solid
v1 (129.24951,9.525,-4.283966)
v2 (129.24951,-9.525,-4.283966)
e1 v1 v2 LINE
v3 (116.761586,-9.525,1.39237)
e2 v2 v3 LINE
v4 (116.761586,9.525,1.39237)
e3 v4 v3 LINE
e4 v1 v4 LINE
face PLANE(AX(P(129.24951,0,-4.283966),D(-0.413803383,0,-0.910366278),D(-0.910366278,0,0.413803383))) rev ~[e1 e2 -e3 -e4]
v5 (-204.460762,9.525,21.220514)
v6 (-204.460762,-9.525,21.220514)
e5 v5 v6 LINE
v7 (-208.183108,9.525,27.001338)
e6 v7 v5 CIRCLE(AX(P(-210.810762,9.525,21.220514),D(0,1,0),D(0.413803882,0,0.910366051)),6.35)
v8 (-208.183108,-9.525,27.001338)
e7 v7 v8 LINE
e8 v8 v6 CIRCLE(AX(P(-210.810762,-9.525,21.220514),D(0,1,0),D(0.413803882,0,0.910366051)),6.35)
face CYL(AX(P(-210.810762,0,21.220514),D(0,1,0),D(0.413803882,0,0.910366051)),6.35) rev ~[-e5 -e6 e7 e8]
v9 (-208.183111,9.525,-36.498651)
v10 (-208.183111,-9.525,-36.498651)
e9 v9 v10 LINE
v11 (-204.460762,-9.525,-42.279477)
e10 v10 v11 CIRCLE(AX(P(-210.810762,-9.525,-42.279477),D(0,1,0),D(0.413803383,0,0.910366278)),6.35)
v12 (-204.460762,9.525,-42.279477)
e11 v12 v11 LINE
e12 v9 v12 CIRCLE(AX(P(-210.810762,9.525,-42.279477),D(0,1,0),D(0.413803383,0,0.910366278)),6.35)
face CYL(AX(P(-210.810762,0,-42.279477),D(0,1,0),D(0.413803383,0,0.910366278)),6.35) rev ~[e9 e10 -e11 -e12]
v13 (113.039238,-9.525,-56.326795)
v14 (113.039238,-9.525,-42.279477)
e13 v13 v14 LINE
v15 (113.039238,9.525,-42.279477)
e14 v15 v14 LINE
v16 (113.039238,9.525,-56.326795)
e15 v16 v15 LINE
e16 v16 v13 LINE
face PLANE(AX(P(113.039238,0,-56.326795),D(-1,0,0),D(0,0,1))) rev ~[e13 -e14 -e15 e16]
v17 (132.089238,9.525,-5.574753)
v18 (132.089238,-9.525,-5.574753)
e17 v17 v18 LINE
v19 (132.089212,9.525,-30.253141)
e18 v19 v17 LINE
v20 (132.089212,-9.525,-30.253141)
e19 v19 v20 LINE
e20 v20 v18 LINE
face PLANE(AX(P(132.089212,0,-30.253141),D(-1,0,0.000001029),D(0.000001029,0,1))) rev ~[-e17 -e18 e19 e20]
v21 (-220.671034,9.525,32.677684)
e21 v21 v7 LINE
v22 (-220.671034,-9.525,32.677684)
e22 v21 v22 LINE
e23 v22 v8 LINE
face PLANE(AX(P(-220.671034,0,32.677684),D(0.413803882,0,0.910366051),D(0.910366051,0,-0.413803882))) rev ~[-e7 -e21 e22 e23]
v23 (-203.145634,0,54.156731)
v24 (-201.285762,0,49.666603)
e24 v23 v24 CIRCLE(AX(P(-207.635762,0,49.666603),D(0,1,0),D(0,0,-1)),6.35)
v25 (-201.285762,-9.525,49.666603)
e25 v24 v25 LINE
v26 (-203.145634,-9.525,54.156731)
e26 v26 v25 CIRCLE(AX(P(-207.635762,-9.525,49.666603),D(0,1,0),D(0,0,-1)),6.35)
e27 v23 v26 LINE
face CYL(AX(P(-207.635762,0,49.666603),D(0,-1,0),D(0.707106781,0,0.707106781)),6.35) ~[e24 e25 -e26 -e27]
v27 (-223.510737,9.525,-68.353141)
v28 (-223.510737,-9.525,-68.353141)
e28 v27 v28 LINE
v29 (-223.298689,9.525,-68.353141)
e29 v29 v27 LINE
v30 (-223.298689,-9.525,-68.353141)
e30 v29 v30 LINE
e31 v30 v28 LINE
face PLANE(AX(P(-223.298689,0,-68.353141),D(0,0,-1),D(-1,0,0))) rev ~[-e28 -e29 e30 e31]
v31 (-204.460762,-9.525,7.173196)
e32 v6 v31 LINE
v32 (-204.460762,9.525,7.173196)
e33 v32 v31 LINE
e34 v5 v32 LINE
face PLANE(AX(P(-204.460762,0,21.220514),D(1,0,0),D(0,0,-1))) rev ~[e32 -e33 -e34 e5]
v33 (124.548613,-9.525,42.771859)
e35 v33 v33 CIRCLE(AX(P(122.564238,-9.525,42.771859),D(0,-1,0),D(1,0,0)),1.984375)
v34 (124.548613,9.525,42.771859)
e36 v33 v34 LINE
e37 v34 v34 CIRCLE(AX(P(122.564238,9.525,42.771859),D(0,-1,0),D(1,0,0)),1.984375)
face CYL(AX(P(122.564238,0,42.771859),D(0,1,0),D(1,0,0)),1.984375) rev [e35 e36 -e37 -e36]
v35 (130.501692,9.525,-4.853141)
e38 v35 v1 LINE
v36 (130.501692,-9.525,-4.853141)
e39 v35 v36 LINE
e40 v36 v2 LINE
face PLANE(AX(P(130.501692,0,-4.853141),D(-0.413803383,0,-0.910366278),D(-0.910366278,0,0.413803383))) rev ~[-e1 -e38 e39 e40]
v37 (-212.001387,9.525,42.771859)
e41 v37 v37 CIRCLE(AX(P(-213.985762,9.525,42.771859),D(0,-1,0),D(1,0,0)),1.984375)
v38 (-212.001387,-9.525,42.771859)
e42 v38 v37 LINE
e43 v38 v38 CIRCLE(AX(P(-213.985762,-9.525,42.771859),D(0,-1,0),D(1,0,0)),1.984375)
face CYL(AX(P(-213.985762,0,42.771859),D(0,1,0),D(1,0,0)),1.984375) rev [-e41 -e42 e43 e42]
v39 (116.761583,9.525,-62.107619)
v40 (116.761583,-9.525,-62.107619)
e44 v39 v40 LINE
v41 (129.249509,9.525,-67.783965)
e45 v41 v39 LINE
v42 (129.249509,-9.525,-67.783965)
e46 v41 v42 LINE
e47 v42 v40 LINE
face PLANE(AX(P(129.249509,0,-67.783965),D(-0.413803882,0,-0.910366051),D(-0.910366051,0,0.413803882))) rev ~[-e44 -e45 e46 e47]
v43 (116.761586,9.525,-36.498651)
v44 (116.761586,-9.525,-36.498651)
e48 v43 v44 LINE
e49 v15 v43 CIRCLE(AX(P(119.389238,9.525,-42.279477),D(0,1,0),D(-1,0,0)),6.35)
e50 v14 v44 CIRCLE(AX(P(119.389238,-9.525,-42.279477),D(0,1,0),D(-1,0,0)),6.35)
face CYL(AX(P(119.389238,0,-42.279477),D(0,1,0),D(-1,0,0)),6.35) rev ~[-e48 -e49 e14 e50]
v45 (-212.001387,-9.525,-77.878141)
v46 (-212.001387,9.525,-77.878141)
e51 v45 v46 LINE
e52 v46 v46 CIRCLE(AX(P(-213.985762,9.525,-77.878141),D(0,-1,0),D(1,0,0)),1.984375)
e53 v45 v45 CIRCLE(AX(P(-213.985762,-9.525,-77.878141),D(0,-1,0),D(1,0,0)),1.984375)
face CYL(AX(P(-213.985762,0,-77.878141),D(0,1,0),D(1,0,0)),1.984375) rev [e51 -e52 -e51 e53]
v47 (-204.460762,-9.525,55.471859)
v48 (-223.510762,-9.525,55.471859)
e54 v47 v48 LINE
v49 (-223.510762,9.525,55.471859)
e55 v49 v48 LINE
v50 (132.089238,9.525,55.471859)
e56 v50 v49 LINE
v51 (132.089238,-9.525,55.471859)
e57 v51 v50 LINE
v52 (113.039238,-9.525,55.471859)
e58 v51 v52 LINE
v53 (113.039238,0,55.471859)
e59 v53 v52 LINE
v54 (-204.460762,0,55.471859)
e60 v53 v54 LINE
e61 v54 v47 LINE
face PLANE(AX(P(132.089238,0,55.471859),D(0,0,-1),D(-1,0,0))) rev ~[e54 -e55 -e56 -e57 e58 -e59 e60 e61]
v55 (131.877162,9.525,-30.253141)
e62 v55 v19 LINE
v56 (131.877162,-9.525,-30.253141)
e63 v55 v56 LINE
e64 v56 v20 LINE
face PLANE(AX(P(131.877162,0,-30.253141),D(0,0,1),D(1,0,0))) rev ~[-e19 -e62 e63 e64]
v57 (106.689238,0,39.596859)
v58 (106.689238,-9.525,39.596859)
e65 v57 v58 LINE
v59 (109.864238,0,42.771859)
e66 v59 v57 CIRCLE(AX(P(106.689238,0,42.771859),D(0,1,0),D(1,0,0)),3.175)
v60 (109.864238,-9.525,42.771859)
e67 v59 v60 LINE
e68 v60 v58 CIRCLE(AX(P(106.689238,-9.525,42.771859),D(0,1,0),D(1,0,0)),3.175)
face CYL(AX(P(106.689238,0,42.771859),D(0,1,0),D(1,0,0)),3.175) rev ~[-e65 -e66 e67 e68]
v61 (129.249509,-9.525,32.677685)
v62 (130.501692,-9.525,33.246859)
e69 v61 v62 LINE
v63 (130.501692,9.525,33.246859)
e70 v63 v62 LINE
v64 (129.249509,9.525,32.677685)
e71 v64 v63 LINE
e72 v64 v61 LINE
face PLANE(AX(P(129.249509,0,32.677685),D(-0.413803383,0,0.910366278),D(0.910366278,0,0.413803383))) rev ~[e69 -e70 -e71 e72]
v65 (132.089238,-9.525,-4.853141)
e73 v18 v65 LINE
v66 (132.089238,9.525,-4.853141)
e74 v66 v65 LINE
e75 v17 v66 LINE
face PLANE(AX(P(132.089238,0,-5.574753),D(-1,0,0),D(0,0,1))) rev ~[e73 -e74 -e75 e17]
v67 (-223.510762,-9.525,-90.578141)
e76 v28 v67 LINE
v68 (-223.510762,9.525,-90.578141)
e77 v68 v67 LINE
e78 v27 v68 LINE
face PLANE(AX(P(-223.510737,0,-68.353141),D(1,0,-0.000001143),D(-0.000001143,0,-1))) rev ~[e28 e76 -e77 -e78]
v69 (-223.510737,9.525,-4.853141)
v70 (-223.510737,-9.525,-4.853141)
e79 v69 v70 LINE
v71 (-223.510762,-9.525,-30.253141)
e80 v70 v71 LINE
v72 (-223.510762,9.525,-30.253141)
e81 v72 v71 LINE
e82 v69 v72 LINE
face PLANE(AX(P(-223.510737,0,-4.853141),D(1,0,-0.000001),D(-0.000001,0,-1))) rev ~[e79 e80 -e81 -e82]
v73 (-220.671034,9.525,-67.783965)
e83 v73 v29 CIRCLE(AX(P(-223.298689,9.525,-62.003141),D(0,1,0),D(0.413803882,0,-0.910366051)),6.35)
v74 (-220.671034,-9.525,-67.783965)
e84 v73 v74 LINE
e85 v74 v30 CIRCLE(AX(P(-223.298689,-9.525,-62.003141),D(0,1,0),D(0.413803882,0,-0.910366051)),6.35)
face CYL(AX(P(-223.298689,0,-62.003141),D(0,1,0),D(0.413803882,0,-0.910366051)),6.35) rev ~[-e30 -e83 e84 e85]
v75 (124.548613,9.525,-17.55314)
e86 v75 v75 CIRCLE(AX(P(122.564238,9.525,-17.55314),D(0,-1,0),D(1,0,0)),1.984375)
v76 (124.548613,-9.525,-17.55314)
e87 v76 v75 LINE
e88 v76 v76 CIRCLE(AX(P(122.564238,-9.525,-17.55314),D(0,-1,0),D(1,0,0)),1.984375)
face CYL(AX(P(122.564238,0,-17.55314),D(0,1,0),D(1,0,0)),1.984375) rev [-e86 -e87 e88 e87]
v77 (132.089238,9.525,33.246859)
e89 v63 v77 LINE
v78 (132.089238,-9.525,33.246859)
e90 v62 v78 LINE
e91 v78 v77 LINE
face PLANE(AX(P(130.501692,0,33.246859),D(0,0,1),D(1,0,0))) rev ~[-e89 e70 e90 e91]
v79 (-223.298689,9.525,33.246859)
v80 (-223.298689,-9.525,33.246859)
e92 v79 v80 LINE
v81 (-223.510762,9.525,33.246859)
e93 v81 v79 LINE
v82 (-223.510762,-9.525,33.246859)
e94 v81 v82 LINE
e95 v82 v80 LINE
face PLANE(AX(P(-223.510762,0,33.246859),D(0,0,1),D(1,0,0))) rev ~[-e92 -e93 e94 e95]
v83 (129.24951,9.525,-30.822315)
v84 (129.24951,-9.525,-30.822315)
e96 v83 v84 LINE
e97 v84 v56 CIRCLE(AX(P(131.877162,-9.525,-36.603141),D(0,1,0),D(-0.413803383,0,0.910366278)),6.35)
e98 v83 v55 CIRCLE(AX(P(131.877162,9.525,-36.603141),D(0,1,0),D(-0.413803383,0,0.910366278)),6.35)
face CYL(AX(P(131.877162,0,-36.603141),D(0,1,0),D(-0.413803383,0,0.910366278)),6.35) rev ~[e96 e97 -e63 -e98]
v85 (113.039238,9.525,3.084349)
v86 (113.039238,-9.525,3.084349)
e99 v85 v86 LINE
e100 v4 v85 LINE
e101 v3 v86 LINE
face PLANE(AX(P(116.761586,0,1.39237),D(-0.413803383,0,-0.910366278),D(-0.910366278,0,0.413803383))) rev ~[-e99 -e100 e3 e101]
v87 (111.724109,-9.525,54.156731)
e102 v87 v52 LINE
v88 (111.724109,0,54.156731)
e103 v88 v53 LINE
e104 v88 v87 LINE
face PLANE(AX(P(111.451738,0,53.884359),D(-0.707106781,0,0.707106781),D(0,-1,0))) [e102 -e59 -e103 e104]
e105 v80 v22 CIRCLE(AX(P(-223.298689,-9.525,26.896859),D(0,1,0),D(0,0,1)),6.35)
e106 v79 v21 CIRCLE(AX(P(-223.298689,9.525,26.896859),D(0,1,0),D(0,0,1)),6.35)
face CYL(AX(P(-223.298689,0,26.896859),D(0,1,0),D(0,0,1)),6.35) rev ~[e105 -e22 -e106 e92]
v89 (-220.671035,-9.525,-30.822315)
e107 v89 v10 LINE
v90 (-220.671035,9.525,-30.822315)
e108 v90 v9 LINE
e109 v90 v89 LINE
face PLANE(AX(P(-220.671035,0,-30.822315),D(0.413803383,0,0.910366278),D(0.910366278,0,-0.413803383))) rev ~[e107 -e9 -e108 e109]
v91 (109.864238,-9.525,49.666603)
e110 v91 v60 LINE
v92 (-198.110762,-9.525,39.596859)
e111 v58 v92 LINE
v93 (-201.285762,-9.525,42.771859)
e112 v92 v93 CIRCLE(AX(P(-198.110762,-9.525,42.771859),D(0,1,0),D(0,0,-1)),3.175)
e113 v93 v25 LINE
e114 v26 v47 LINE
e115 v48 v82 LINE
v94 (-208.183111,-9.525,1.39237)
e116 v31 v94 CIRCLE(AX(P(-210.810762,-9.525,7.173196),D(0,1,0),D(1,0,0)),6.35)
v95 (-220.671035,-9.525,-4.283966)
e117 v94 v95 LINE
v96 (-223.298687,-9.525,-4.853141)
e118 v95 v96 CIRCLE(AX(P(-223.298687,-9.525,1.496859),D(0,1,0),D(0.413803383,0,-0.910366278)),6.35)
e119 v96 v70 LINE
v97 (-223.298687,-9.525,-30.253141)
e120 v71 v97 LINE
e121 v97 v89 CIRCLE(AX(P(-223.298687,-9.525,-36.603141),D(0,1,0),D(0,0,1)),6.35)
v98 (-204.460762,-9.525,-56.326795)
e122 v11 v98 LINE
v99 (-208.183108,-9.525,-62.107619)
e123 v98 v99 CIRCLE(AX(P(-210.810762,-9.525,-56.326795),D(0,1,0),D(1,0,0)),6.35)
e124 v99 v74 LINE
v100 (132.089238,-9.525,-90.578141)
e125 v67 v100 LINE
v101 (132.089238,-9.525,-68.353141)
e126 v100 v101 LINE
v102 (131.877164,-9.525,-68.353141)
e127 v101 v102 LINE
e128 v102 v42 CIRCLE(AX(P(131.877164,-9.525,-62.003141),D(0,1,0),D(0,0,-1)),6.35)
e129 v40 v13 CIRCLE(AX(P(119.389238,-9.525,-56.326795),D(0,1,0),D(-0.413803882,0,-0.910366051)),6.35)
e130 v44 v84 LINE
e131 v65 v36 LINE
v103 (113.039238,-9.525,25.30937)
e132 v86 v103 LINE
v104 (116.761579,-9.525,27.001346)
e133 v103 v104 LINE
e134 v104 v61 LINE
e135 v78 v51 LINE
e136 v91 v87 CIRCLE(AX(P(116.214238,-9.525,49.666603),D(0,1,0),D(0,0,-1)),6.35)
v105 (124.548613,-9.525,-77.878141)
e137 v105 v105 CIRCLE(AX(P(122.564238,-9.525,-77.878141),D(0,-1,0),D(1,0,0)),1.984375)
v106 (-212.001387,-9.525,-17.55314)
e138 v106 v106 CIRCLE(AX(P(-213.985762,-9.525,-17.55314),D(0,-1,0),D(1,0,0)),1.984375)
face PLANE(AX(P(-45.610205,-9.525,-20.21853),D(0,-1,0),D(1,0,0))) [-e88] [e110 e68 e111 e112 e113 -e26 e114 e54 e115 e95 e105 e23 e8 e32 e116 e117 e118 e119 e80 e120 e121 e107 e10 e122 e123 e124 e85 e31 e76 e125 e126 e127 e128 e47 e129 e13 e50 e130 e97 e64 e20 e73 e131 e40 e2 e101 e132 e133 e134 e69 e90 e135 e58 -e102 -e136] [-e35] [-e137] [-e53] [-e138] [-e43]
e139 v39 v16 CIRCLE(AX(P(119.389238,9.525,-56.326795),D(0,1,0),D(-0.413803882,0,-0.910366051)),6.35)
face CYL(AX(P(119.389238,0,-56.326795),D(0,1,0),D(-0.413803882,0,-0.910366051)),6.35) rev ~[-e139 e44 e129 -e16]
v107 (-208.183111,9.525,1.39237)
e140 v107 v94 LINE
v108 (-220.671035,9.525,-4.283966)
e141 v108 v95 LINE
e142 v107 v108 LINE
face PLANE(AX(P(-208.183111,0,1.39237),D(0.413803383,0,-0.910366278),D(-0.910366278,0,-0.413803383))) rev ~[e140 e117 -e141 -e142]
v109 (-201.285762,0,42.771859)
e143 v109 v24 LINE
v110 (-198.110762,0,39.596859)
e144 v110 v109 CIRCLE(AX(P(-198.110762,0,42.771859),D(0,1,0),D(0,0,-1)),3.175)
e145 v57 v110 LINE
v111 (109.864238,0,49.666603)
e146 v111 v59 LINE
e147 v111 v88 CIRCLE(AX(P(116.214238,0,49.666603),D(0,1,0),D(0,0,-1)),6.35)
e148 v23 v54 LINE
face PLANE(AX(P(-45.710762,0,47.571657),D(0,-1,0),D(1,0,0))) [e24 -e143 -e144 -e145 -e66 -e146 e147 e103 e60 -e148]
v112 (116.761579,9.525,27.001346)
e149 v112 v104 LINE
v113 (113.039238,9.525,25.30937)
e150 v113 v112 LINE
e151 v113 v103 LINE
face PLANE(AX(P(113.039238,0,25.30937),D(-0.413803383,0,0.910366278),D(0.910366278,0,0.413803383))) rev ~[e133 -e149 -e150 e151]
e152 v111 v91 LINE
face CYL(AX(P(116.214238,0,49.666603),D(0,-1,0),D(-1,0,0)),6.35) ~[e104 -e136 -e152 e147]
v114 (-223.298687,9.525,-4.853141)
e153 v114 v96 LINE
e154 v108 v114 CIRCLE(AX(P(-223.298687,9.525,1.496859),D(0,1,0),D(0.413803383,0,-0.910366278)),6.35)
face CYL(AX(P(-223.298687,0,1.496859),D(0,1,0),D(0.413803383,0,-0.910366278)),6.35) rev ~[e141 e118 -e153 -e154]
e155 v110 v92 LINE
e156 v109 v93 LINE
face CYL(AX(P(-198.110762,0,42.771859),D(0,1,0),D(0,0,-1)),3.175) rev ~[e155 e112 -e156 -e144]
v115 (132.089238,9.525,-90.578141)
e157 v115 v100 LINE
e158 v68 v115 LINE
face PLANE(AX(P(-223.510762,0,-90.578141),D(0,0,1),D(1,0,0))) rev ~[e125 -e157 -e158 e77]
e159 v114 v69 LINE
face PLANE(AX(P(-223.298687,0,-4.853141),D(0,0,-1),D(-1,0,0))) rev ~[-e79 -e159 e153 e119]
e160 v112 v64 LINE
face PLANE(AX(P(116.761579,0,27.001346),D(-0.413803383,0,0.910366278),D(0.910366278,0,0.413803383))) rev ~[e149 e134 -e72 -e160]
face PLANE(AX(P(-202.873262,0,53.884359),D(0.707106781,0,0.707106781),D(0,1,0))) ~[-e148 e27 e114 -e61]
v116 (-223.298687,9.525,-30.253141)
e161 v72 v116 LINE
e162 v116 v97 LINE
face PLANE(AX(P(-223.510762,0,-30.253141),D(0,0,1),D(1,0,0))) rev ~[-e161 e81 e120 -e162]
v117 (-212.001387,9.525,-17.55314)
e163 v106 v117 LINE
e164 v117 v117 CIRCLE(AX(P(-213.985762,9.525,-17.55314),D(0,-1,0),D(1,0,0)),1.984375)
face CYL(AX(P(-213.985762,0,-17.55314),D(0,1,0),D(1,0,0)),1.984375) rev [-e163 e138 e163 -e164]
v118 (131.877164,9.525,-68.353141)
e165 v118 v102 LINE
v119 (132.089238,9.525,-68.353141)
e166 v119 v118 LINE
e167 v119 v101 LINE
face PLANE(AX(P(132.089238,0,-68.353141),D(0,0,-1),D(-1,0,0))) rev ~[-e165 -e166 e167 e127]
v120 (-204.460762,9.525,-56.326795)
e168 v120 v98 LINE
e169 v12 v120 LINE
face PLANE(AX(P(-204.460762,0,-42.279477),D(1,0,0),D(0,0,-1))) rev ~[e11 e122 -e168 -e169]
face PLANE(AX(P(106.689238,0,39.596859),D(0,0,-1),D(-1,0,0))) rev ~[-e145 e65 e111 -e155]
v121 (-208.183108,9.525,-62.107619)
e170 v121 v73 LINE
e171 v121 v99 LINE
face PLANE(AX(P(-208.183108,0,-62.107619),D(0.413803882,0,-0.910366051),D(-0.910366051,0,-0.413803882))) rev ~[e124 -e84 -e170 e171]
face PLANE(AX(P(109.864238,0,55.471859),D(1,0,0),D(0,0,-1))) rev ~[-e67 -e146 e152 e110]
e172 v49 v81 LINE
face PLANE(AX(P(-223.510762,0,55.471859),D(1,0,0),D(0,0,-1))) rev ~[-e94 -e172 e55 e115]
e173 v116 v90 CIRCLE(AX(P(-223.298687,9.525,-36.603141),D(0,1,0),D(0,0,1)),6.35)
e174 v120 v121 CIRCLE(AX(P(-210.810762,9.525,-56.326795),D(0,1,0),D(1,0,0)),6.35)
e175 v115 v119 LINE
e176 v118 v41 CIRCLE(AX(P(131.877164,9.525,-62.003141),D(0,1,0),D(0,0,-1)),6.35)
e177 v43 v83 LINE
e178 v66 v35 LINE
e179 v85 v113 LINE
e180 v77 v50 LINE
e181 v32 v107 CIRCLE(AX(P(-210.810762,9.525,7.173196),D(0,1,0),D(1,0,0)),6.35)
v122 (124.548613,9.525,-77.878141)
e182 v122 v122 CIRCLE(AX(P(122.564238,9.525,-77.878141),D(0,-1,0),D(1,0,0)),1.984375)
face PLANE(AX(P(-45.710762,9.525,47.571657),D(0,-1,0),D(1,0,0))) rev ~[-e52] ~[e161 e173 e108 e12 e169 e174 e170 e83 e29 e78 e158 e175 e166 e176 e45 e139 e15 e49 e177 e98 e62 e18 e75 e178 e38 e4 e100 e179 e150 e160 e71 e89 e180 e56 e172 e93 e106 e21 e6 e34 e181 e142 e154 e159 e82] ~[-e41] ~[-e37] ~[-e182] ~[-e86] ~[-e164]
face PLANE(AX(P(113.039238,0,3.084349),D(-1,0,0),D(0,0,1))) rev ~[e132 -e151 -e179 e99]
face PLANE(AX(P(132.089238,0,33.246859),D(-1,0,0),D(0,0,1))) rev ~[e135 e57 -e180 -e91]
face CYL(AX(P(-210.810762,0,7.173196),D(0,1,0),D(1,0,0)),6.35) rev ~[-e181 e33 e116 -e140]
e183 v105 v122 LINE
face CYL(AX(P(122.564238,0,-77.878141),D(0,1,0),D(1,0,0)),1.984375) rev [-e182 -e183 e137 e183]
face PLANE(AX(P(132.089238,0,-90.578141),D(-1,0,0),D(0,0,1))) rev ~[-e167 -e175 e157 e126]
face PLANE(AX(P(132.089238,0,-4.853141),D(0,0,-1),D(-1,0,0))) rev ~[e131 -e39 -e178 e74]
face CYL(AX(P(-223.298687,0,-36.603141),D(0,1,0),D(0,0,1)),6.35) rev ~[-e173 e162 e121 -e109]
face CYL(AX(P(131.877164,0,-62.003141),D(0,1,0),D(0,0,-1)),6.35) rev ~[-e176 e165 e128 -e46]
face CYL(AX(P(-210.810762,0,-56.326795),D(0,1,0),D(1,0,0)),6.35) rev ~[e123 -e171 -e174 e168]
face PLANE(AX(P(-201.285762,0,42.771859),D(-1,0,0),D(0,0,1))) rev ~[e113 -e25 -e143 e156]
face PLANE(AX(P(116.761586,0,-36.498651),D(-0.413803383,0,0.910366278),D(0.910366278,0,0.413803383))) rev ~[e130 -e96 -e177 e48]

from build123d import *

# Parameters (mm, degrees)
F0_R     = 1.984375
F1_DEPTH = 9.525
F2_DEPTH = 9.525
F3_SIZE  = 3.175
F4_R     = 6.35


# Not quite as in the source:
# - ends of sketch curves that miss each other by under 0.0002 mm in the source are joined


with BuildPart() as f1:
    # F0 (on Front) → F1 (new body)
    with BuildSketch(Plane.XZ):
        with BuildLine():
            ThreePointArc((106.6892375248, 39.5968594302), (108.9343015551, 40.5267953999), (109.8642375248, 42.7718594302))
            Line((109.8642375248, 42.7718594302), (109.8642375248, 55.4718594302))
            Line((109.8642375248, 55.4718594302), (-201.2857624752, 55.4718594302))
            Line((-201.2857624752, 55.4718594302), (-201.2857624752, 42.7718594302))
            ThreePointArc((-201.2857624752, 42.7718594302), (-200.3558265055, 40.5267953999), (-198.1107624752, 39.5968594302))
            Line((-198.1107624752, 39.5968594302), (106.6892375248, 39.5968594302))
        make_face()
        with BuildLine():
            Line((109.8642375248, 55.4718594302), (109.8642375248, 42.7718594302))
            ThreePointArc((109.8642375248, 42.7718594302), (108.9343015551, 40.5267953999), (106.6892375248, 39.5968594302))
            Line((106.6892375248, 39.5968594302), (-198.1107624752, 39.5968594302))
            ThreePointArc((-198.1107624752, 39.5968594302), (-200.3558265055, 40.5267953999), (-201.2857624752, 42.7718594302))
            Line((-201.2857624752, 42.7718594302), (-201.2857624752, 55.4718594302))
            Line((-201.2857624752, 55.4718594302), (-223.5107624752, 55.4718594302))
            Line((-223.5107624752, 55.4718594302), (-223.5107624752, 33.2468594302))
            Line((-223.5107624752, 33.2468594302), (-223.2986885503, 33.2468594302))
            ThreePointArc((-223.2986885503, 33.2468594302), (-221.9543922864, 33.1029344825), (-220.6710339026, 32.6776838569))
            Line((-220.6710339026, 32.6776838569), (-208.1831078275, 27.0013383101))
            ThreePointArc((-208.1831078275, 27.0013383101), (-205.471843717, 24.6583106333), (-204.4607624752, 21.2205138834))
            Line((-204.4607624752, 21.2205138834), (-204.4607624752, 7.1731958926))
            ThreePointArc((-204.4607624752, 7.1731958926), (-205.4718446589, 3.7353976799), (-208.1831109951, 1.392370026))
            Line((-208.1831109951, 1.392370026), (-220.6710352489, -4.2839664363))
            ThreePointArc((-220.6710352489, -4.2839664363), (-221.9543921654, -4.7092159904), (-223.298686729, -4.8531405698))
            Line((-223.298686729, -4.8531405698), (-223.5107370752, -4.8531405698))
            Line((-223.5107370752, -4.8531405698), (-223.5107624752, -30.2531405698))
            Line((-223.5107624752, -30.2531405698), (-223.298686729, -30.2531405698))
            ThreePointArc((-223.298686729, -30.2531405698), (-221.9543921654, -30.3970651492), (-220.6710352489, -30.8223147033))
            Line((-220.6710352489, -30.8223147033), (-208.1831109951, -36.4986511657))
            ThreePointArc((-208.1831109951, -36.4986511657), (-205.4718446589, -38.8416788196), (-204.4607624752, -42.2794770322))
            Line((-204.4607624752, -42.2794770322), (-204.4607624752, -56.326795023))
            ThreePointArc((-204.4607624752, -56.326795023), (-205.471843717, -59.7645917729), (-208.1831078275, -62.1076194497))
            Line((-208.1831078275, -62.1076194497), (-220.6710339026, -67.7839649965))
            ThreePointArc((-220.6710339026, -67.7839649965), (-221.9543922864, -68.2092156221), (-223.2986885503, -68.3531405698))
            Line((-223.2986885503, -68.3531405698), (-223.5107370752, -68.3531405698))
            Line((-223.5107370752, -68.3531405698), (-223.5107624752, -90.5781405698))
            Line((-223.5107624752, -90.5781405698), (132.0892375248, -90.5781405698))
            Line((132.0892375248, -90.5781405698), (132.0892375248, -68.3531405698))
            Line((132.0892375248, -68.3531405698), (131.8771635999, -68.3531405698))
            ThreePointArc((131.8771635999, -68.3531405698), (130.532867336, -68.2092156221), (129.2495089522, -67.7839649965))
            Line((129.2495089522, -67.7839649965), (116.7615828771, -62.1076194497))
            ThreePointArc((116.7615828771, -62.1076194497), (114.0503187666, -59.7645917729), (113.0392375248, -56.326795023))
            Line((113.0392375248, -56.326795023), (113.0392375248, -42.2794770322))
            ThreePointArc((113.0392375248, -42.2794770322), (114.0503197085, -38.8416788196), (116.7615860447, -36.4986511657))
            Line((116.7615860447, -36.4986511657), (129.2495102985, -30.8223147033))
            ThreePointArc((129.2495102985, -30.8223147033), (130.5328672149, -30.3970651492), (131.8771617786, -30.2531405698))
            Line((131.8771617786, -30.2531405698), (132.0892121248, -30.2531405698))
            Line((132.0892121248, -30.2531405698), (132.0892375248, -5.5747531892))
            Line((132.0892375248, -5.5747531892), (130.5016917914, -4.8531405698))
            Line((130.5016917914, -4.8531405698), (129.2495102985, -4.2839664363))
            Line((129.2495102985, -4.2839664363), (116.7615860447, 1.392370026))
            Line((116.7615860447, 1.392370026), (113.0392375248, 3.0843487889))
            Line((113.0392375248, 3.0843487889), (113.0392375248, 7.1731958926))
            Line((113.0392375248, 7.1731958926), (113.0392375248, 21.2205138834))
            Line((113.0392375248, 21.2205138834), (113.0392375248, 25.3093700715))
            Line((113.0392375248, 25.3093700715), (116.7615794549, 27.001345839))
            Line((116.7615794549, 27.001345839), (129.2495086403, 32.677684543))
            Line((129.2495086403, 32.677684543), (130.5016917914, 33.2468594302))
            Line((130.5016917914, 33.2468594302), (132.0892375248, 33.9684720496))
            Line((132.0892375248, 33.9684720496), (132.0892375248, 55.4718594302))
            Line((132.0892375248, 55.4718594302), (109.8642375248, 55.4718594302))
        make_face()
        with Locations((-213.9857624752, -77.8781405698)):
            Circle(F0_R, mode=Mode.SUBTRACT)
        with Locations((122.5642375248, -77.8781405698)):
            Circle(F0_R, mode=Mode.SUBTRACT)
        with Locations((-213.9857624752, -17.5531402737)):
            Circle(F0_R, mode=Mode.SUBTRACT)
        with Locations((-213.9857624752, 42.7718594302)):
            Circle(F0_R, mode=Mode.SUBTRACT)
        with Locations((122.5642375248, -17.5531402737)):
            Circle(F0_R, mode=Mode.SUBTRACT)
        with Locations((122.5642375248, 42.7718594302)):
            Circle(F0_R, mode=Mode.SUBTRACT)
        Polygon((132.0892375248, 33.2468594302), (132.0892375248, 33.9684720496), (130.5016917914, 33.2468594302), (131.8771635999, 33.2468594302), align=None)
        Polygon((132.0892375248, -5.5747531892), (132.0892375248, -4.8531405698), (131.8771617786, -4.8531405698), (130.5016917914, -4.8531405698), align=None)
    extrude(amount=-F1_DEPTH)

    # F0 (on Front) → F2 (join)
    with BuildSketch(Plane.XZ):
        with BuildLine():
            Line((109.8642375248, 55.4718594302), (109.8642375248, 42.7718594302))
            ThreePointArc((109.8642375248, 42.7718594302), (108.9343015551, 40.5267953999), (106.6892375248, 39.5968594302))
            Line((106.6892375248, 39.5968594302), (-198.1107624752, 39.5968594302))
            ThreePointArc((-198.1107624752, 39.5968594302), (-200.3558265055, 40.5267953999), (-201.2857624752, 42.7718594302))
            Line((-201.2857624752, 42.7718594302), (-201.2857624752, 55.4718594302))
            Line((-201.2857624752, 55.4718594302), (-223.5107624752, 55.4718594302))
            Line((-223.5107624752, 55.4718594302), (-223.5107624752, 33.2468594302))
            Line((-223.5107624752, 33.2468594302), (-223.2986885503, 33.2468594302))
            ThreePointArc((-223.2986885503, 33.2468594302), (-221.9543922864, 33.1029344825), (-220.6710339026, 32.6776838569))
            Line((-220.6710339026, 32.6776838569), (-208.1831078275, 27.0013383101))
            ThreePointArc((-208.1831078275, 27.0013383101), (-205.471843717, 24.6583106333), (-204.4607624752, 21.2205138834))
            Line((-204.4607624752, 21.2205138834), (-204.4607624752, 7.1731958926))
            ThreePointArc((-204.4607624752, 7.1731958926), (-205.4718446589, 3.7353976799), (-208.1831109951, 1.392370026))
            Line((-208.1831109951, 1.392370026), (-220.6710352489, -4.2839664363))
            ThreePointArc((-220.6710352489, -4.2839664363), (-221.9543921654, -4.7092159904), (-223.298686729, -4.8531405698))
            Line((-223.298686729, -4.8531405698), (-223.5107370752, -4.8531405698))
            Line((-223.5107370752, -4.8531405698), (-223.5107624752, -30.2531405698))
            Line((-223.5107624752, -30.2531405698), (-223.298686729, -30.2531405698))
            ThreePointArc((-223.298686729, -30.2531405698), (-221.9543921654, -30.3970651492), (-220.6710352489, -30.8223147033))
            Line((-220.6710352489, -30.8223147033), (-208.1831109951, -36.4986511657))
            ThreePointArc((-208.1831109951, -36.4986511657), (-205.4718446589, -38.8416788196), (-204.4607624752, -42.2794770322))
            Line((-204.4607624752, -42.2794770322), (-204.4607624752, -56.326795023))
            ThreePointArc((-204.4607624752, -56.326795023), (-205.471843717, -59.7645917729), (-208.1831078275, -62.1076194497))
            Line((-208.1831078275, -62.1076194497), (-220.6710339026, -67.7839649965))
            ThreePointArc((-220.6710339026, -67.7839649965), (-221.9543922864, -68.2092156221), (-223.2986885503, -68.3531405698))
            Line((-223.2986885503, -68.3531405698), (-223.5107370752, -68.3531405698))
            Line((-223.5107370752, -68.3531405698), (-223.5107624752, -90.5781405698))
            Line((-223.5107624752, -90.5781405698), (132.0892375248, -90.5781405698))
            Line((132.0892375248, -90.5781405698), (132.0892375248, -68.3531405698))
            Line((132.0892375248, -68.3531405698), (131.8771635999, -68.3531405698))
            ThreePointArc((131.8771635999, -68.3531405698), (130.532867336, -68.2092156221), (129.2495089522, -67.7839649965))
            Line((129.2495089522, -67.7839649965), (116.7615828771, -62.1076194497))
            ThreePointArc((116.7615828771, -62.1076194497), (114.0503187666, -59.7645917729), (113.0392375248, -56.326795023))
            Line((113.0392375248, -56.326795023), (113.0392375248, -42.2794770322))
            ThreePointArc((113.0392375248, -42.2794770322), (114.0503197085, -38.8416788196), (116.7615860447, -36.4986511657))
            Line((116.7615860447, -36.4986511657), (129.2495102985, -30.8223147033))
            ThreePointArc((129.2495102985, -30.8223147033), (130.5328672149, -30.3970651492), (131.8771617786, -30.2531405698))
            Line((131.8771617786, -30.2531405698), (132.0892121248, -30.2531405698))
            Line((132.0892121248, -30.2531405698), (132.0892375248, -5.5747531892))
            Line((132.0892375248, -5.5747531892), (130.5016917914, -4.8531405698))
            Line((130.5016917914, -4.8531405698), (129.2495102985, -4.2839664363))
            Line((129.2495102985, -4.2839664363), (116.7615860447, 1.392370026))
            Line((116.7615860447, 1.392370026), (113.0392375248, 3.0843487889))
            Line((113.0392375248, 3.0843487889), (113.0392375248, 7.1731958926))
            Line((113.0392375248, 7.1731958926), (113.0392375248, 21.2205138834))
            Line((113.0392375248, 21.2205138834), (113.0392375248, 25.3093700715))
            Line((113.0392375248, 25.3093700715), (116.7615794549, 27.001345839))
            Line((116.7615794549, 27.001345839), (129.2495086403, 32.677684543))
            Line((129.2495086403, 32.677684543), (130.5016917914, 33.2468594302))
            Line((130.5016917914, 33.2468594302), (132.0892375248, 33.9684720496))
            Line((132.0892375248, 33.9684720496), (132.0892375248, 55.4718594302))
            Line((132.0892375248, 55.4718594302), (109.8642375248, 55.4718594302))
        make_face()
        with Locations((-213.9857624752, -77.8781405698)):
            Circle(F0_R, mode=Mode.SUBTRACT)
        with Locations((122.5642375248, -77.8781405698)):
            Circle(F0_R, mode=Mode.SUBTRACT)
        with Locations((-213.9857624752, -17.5531402737)):
            Circle(F0_R, mode=Mode.SUBTRACT)
        with Locations((-213.9857624752, 42.7718594302)):
            Circle(F0_R, mode=Mode.SUBTRACT)
        with Locations((122.5642375248, -17.5531402737)):
            Circle(F0_R, mode=Mode.SUBTRACT)
        with Locations((122.5642375248, 42.7718594302)):
            Circle(F0_R, mode=Mode.SUBTRACT)
        Polygon((132.0892375248, 33.2468594302), (132.0892375248, 33.9684720496), (130.5016917914, 33.2468594302), (131.8771635999, 33.2468594302), align=None)
        Polygon((132.0892375248, -5.5747531892), (132.0892375248, -4.8531405698), (131.8771617786, -4.8531405698), (130.5016917914, -4.8531405698), align=None)
    extrude(amount=F2_DEPTH)

    # F3
    f3_edges = [f1.edges().sort_by_distance(p)[0] for p in [
        (-201.285762, -4.7625, 55.471859),
        (109.864238, -4.7625, 55.471859),
    ]]
    chamfer(f3_edges, length=F3_SIZE)

    # F4
    f4_edges = [f1.edges().sort_by_distance(p)[0] for p in [
        (109.864238, -4.7625, 52.296859),
        (-201.285762, -4.7625, 52.296859),
    ]]
    fillet(f4_edges, radius=F4_R)


solid = f1.part
